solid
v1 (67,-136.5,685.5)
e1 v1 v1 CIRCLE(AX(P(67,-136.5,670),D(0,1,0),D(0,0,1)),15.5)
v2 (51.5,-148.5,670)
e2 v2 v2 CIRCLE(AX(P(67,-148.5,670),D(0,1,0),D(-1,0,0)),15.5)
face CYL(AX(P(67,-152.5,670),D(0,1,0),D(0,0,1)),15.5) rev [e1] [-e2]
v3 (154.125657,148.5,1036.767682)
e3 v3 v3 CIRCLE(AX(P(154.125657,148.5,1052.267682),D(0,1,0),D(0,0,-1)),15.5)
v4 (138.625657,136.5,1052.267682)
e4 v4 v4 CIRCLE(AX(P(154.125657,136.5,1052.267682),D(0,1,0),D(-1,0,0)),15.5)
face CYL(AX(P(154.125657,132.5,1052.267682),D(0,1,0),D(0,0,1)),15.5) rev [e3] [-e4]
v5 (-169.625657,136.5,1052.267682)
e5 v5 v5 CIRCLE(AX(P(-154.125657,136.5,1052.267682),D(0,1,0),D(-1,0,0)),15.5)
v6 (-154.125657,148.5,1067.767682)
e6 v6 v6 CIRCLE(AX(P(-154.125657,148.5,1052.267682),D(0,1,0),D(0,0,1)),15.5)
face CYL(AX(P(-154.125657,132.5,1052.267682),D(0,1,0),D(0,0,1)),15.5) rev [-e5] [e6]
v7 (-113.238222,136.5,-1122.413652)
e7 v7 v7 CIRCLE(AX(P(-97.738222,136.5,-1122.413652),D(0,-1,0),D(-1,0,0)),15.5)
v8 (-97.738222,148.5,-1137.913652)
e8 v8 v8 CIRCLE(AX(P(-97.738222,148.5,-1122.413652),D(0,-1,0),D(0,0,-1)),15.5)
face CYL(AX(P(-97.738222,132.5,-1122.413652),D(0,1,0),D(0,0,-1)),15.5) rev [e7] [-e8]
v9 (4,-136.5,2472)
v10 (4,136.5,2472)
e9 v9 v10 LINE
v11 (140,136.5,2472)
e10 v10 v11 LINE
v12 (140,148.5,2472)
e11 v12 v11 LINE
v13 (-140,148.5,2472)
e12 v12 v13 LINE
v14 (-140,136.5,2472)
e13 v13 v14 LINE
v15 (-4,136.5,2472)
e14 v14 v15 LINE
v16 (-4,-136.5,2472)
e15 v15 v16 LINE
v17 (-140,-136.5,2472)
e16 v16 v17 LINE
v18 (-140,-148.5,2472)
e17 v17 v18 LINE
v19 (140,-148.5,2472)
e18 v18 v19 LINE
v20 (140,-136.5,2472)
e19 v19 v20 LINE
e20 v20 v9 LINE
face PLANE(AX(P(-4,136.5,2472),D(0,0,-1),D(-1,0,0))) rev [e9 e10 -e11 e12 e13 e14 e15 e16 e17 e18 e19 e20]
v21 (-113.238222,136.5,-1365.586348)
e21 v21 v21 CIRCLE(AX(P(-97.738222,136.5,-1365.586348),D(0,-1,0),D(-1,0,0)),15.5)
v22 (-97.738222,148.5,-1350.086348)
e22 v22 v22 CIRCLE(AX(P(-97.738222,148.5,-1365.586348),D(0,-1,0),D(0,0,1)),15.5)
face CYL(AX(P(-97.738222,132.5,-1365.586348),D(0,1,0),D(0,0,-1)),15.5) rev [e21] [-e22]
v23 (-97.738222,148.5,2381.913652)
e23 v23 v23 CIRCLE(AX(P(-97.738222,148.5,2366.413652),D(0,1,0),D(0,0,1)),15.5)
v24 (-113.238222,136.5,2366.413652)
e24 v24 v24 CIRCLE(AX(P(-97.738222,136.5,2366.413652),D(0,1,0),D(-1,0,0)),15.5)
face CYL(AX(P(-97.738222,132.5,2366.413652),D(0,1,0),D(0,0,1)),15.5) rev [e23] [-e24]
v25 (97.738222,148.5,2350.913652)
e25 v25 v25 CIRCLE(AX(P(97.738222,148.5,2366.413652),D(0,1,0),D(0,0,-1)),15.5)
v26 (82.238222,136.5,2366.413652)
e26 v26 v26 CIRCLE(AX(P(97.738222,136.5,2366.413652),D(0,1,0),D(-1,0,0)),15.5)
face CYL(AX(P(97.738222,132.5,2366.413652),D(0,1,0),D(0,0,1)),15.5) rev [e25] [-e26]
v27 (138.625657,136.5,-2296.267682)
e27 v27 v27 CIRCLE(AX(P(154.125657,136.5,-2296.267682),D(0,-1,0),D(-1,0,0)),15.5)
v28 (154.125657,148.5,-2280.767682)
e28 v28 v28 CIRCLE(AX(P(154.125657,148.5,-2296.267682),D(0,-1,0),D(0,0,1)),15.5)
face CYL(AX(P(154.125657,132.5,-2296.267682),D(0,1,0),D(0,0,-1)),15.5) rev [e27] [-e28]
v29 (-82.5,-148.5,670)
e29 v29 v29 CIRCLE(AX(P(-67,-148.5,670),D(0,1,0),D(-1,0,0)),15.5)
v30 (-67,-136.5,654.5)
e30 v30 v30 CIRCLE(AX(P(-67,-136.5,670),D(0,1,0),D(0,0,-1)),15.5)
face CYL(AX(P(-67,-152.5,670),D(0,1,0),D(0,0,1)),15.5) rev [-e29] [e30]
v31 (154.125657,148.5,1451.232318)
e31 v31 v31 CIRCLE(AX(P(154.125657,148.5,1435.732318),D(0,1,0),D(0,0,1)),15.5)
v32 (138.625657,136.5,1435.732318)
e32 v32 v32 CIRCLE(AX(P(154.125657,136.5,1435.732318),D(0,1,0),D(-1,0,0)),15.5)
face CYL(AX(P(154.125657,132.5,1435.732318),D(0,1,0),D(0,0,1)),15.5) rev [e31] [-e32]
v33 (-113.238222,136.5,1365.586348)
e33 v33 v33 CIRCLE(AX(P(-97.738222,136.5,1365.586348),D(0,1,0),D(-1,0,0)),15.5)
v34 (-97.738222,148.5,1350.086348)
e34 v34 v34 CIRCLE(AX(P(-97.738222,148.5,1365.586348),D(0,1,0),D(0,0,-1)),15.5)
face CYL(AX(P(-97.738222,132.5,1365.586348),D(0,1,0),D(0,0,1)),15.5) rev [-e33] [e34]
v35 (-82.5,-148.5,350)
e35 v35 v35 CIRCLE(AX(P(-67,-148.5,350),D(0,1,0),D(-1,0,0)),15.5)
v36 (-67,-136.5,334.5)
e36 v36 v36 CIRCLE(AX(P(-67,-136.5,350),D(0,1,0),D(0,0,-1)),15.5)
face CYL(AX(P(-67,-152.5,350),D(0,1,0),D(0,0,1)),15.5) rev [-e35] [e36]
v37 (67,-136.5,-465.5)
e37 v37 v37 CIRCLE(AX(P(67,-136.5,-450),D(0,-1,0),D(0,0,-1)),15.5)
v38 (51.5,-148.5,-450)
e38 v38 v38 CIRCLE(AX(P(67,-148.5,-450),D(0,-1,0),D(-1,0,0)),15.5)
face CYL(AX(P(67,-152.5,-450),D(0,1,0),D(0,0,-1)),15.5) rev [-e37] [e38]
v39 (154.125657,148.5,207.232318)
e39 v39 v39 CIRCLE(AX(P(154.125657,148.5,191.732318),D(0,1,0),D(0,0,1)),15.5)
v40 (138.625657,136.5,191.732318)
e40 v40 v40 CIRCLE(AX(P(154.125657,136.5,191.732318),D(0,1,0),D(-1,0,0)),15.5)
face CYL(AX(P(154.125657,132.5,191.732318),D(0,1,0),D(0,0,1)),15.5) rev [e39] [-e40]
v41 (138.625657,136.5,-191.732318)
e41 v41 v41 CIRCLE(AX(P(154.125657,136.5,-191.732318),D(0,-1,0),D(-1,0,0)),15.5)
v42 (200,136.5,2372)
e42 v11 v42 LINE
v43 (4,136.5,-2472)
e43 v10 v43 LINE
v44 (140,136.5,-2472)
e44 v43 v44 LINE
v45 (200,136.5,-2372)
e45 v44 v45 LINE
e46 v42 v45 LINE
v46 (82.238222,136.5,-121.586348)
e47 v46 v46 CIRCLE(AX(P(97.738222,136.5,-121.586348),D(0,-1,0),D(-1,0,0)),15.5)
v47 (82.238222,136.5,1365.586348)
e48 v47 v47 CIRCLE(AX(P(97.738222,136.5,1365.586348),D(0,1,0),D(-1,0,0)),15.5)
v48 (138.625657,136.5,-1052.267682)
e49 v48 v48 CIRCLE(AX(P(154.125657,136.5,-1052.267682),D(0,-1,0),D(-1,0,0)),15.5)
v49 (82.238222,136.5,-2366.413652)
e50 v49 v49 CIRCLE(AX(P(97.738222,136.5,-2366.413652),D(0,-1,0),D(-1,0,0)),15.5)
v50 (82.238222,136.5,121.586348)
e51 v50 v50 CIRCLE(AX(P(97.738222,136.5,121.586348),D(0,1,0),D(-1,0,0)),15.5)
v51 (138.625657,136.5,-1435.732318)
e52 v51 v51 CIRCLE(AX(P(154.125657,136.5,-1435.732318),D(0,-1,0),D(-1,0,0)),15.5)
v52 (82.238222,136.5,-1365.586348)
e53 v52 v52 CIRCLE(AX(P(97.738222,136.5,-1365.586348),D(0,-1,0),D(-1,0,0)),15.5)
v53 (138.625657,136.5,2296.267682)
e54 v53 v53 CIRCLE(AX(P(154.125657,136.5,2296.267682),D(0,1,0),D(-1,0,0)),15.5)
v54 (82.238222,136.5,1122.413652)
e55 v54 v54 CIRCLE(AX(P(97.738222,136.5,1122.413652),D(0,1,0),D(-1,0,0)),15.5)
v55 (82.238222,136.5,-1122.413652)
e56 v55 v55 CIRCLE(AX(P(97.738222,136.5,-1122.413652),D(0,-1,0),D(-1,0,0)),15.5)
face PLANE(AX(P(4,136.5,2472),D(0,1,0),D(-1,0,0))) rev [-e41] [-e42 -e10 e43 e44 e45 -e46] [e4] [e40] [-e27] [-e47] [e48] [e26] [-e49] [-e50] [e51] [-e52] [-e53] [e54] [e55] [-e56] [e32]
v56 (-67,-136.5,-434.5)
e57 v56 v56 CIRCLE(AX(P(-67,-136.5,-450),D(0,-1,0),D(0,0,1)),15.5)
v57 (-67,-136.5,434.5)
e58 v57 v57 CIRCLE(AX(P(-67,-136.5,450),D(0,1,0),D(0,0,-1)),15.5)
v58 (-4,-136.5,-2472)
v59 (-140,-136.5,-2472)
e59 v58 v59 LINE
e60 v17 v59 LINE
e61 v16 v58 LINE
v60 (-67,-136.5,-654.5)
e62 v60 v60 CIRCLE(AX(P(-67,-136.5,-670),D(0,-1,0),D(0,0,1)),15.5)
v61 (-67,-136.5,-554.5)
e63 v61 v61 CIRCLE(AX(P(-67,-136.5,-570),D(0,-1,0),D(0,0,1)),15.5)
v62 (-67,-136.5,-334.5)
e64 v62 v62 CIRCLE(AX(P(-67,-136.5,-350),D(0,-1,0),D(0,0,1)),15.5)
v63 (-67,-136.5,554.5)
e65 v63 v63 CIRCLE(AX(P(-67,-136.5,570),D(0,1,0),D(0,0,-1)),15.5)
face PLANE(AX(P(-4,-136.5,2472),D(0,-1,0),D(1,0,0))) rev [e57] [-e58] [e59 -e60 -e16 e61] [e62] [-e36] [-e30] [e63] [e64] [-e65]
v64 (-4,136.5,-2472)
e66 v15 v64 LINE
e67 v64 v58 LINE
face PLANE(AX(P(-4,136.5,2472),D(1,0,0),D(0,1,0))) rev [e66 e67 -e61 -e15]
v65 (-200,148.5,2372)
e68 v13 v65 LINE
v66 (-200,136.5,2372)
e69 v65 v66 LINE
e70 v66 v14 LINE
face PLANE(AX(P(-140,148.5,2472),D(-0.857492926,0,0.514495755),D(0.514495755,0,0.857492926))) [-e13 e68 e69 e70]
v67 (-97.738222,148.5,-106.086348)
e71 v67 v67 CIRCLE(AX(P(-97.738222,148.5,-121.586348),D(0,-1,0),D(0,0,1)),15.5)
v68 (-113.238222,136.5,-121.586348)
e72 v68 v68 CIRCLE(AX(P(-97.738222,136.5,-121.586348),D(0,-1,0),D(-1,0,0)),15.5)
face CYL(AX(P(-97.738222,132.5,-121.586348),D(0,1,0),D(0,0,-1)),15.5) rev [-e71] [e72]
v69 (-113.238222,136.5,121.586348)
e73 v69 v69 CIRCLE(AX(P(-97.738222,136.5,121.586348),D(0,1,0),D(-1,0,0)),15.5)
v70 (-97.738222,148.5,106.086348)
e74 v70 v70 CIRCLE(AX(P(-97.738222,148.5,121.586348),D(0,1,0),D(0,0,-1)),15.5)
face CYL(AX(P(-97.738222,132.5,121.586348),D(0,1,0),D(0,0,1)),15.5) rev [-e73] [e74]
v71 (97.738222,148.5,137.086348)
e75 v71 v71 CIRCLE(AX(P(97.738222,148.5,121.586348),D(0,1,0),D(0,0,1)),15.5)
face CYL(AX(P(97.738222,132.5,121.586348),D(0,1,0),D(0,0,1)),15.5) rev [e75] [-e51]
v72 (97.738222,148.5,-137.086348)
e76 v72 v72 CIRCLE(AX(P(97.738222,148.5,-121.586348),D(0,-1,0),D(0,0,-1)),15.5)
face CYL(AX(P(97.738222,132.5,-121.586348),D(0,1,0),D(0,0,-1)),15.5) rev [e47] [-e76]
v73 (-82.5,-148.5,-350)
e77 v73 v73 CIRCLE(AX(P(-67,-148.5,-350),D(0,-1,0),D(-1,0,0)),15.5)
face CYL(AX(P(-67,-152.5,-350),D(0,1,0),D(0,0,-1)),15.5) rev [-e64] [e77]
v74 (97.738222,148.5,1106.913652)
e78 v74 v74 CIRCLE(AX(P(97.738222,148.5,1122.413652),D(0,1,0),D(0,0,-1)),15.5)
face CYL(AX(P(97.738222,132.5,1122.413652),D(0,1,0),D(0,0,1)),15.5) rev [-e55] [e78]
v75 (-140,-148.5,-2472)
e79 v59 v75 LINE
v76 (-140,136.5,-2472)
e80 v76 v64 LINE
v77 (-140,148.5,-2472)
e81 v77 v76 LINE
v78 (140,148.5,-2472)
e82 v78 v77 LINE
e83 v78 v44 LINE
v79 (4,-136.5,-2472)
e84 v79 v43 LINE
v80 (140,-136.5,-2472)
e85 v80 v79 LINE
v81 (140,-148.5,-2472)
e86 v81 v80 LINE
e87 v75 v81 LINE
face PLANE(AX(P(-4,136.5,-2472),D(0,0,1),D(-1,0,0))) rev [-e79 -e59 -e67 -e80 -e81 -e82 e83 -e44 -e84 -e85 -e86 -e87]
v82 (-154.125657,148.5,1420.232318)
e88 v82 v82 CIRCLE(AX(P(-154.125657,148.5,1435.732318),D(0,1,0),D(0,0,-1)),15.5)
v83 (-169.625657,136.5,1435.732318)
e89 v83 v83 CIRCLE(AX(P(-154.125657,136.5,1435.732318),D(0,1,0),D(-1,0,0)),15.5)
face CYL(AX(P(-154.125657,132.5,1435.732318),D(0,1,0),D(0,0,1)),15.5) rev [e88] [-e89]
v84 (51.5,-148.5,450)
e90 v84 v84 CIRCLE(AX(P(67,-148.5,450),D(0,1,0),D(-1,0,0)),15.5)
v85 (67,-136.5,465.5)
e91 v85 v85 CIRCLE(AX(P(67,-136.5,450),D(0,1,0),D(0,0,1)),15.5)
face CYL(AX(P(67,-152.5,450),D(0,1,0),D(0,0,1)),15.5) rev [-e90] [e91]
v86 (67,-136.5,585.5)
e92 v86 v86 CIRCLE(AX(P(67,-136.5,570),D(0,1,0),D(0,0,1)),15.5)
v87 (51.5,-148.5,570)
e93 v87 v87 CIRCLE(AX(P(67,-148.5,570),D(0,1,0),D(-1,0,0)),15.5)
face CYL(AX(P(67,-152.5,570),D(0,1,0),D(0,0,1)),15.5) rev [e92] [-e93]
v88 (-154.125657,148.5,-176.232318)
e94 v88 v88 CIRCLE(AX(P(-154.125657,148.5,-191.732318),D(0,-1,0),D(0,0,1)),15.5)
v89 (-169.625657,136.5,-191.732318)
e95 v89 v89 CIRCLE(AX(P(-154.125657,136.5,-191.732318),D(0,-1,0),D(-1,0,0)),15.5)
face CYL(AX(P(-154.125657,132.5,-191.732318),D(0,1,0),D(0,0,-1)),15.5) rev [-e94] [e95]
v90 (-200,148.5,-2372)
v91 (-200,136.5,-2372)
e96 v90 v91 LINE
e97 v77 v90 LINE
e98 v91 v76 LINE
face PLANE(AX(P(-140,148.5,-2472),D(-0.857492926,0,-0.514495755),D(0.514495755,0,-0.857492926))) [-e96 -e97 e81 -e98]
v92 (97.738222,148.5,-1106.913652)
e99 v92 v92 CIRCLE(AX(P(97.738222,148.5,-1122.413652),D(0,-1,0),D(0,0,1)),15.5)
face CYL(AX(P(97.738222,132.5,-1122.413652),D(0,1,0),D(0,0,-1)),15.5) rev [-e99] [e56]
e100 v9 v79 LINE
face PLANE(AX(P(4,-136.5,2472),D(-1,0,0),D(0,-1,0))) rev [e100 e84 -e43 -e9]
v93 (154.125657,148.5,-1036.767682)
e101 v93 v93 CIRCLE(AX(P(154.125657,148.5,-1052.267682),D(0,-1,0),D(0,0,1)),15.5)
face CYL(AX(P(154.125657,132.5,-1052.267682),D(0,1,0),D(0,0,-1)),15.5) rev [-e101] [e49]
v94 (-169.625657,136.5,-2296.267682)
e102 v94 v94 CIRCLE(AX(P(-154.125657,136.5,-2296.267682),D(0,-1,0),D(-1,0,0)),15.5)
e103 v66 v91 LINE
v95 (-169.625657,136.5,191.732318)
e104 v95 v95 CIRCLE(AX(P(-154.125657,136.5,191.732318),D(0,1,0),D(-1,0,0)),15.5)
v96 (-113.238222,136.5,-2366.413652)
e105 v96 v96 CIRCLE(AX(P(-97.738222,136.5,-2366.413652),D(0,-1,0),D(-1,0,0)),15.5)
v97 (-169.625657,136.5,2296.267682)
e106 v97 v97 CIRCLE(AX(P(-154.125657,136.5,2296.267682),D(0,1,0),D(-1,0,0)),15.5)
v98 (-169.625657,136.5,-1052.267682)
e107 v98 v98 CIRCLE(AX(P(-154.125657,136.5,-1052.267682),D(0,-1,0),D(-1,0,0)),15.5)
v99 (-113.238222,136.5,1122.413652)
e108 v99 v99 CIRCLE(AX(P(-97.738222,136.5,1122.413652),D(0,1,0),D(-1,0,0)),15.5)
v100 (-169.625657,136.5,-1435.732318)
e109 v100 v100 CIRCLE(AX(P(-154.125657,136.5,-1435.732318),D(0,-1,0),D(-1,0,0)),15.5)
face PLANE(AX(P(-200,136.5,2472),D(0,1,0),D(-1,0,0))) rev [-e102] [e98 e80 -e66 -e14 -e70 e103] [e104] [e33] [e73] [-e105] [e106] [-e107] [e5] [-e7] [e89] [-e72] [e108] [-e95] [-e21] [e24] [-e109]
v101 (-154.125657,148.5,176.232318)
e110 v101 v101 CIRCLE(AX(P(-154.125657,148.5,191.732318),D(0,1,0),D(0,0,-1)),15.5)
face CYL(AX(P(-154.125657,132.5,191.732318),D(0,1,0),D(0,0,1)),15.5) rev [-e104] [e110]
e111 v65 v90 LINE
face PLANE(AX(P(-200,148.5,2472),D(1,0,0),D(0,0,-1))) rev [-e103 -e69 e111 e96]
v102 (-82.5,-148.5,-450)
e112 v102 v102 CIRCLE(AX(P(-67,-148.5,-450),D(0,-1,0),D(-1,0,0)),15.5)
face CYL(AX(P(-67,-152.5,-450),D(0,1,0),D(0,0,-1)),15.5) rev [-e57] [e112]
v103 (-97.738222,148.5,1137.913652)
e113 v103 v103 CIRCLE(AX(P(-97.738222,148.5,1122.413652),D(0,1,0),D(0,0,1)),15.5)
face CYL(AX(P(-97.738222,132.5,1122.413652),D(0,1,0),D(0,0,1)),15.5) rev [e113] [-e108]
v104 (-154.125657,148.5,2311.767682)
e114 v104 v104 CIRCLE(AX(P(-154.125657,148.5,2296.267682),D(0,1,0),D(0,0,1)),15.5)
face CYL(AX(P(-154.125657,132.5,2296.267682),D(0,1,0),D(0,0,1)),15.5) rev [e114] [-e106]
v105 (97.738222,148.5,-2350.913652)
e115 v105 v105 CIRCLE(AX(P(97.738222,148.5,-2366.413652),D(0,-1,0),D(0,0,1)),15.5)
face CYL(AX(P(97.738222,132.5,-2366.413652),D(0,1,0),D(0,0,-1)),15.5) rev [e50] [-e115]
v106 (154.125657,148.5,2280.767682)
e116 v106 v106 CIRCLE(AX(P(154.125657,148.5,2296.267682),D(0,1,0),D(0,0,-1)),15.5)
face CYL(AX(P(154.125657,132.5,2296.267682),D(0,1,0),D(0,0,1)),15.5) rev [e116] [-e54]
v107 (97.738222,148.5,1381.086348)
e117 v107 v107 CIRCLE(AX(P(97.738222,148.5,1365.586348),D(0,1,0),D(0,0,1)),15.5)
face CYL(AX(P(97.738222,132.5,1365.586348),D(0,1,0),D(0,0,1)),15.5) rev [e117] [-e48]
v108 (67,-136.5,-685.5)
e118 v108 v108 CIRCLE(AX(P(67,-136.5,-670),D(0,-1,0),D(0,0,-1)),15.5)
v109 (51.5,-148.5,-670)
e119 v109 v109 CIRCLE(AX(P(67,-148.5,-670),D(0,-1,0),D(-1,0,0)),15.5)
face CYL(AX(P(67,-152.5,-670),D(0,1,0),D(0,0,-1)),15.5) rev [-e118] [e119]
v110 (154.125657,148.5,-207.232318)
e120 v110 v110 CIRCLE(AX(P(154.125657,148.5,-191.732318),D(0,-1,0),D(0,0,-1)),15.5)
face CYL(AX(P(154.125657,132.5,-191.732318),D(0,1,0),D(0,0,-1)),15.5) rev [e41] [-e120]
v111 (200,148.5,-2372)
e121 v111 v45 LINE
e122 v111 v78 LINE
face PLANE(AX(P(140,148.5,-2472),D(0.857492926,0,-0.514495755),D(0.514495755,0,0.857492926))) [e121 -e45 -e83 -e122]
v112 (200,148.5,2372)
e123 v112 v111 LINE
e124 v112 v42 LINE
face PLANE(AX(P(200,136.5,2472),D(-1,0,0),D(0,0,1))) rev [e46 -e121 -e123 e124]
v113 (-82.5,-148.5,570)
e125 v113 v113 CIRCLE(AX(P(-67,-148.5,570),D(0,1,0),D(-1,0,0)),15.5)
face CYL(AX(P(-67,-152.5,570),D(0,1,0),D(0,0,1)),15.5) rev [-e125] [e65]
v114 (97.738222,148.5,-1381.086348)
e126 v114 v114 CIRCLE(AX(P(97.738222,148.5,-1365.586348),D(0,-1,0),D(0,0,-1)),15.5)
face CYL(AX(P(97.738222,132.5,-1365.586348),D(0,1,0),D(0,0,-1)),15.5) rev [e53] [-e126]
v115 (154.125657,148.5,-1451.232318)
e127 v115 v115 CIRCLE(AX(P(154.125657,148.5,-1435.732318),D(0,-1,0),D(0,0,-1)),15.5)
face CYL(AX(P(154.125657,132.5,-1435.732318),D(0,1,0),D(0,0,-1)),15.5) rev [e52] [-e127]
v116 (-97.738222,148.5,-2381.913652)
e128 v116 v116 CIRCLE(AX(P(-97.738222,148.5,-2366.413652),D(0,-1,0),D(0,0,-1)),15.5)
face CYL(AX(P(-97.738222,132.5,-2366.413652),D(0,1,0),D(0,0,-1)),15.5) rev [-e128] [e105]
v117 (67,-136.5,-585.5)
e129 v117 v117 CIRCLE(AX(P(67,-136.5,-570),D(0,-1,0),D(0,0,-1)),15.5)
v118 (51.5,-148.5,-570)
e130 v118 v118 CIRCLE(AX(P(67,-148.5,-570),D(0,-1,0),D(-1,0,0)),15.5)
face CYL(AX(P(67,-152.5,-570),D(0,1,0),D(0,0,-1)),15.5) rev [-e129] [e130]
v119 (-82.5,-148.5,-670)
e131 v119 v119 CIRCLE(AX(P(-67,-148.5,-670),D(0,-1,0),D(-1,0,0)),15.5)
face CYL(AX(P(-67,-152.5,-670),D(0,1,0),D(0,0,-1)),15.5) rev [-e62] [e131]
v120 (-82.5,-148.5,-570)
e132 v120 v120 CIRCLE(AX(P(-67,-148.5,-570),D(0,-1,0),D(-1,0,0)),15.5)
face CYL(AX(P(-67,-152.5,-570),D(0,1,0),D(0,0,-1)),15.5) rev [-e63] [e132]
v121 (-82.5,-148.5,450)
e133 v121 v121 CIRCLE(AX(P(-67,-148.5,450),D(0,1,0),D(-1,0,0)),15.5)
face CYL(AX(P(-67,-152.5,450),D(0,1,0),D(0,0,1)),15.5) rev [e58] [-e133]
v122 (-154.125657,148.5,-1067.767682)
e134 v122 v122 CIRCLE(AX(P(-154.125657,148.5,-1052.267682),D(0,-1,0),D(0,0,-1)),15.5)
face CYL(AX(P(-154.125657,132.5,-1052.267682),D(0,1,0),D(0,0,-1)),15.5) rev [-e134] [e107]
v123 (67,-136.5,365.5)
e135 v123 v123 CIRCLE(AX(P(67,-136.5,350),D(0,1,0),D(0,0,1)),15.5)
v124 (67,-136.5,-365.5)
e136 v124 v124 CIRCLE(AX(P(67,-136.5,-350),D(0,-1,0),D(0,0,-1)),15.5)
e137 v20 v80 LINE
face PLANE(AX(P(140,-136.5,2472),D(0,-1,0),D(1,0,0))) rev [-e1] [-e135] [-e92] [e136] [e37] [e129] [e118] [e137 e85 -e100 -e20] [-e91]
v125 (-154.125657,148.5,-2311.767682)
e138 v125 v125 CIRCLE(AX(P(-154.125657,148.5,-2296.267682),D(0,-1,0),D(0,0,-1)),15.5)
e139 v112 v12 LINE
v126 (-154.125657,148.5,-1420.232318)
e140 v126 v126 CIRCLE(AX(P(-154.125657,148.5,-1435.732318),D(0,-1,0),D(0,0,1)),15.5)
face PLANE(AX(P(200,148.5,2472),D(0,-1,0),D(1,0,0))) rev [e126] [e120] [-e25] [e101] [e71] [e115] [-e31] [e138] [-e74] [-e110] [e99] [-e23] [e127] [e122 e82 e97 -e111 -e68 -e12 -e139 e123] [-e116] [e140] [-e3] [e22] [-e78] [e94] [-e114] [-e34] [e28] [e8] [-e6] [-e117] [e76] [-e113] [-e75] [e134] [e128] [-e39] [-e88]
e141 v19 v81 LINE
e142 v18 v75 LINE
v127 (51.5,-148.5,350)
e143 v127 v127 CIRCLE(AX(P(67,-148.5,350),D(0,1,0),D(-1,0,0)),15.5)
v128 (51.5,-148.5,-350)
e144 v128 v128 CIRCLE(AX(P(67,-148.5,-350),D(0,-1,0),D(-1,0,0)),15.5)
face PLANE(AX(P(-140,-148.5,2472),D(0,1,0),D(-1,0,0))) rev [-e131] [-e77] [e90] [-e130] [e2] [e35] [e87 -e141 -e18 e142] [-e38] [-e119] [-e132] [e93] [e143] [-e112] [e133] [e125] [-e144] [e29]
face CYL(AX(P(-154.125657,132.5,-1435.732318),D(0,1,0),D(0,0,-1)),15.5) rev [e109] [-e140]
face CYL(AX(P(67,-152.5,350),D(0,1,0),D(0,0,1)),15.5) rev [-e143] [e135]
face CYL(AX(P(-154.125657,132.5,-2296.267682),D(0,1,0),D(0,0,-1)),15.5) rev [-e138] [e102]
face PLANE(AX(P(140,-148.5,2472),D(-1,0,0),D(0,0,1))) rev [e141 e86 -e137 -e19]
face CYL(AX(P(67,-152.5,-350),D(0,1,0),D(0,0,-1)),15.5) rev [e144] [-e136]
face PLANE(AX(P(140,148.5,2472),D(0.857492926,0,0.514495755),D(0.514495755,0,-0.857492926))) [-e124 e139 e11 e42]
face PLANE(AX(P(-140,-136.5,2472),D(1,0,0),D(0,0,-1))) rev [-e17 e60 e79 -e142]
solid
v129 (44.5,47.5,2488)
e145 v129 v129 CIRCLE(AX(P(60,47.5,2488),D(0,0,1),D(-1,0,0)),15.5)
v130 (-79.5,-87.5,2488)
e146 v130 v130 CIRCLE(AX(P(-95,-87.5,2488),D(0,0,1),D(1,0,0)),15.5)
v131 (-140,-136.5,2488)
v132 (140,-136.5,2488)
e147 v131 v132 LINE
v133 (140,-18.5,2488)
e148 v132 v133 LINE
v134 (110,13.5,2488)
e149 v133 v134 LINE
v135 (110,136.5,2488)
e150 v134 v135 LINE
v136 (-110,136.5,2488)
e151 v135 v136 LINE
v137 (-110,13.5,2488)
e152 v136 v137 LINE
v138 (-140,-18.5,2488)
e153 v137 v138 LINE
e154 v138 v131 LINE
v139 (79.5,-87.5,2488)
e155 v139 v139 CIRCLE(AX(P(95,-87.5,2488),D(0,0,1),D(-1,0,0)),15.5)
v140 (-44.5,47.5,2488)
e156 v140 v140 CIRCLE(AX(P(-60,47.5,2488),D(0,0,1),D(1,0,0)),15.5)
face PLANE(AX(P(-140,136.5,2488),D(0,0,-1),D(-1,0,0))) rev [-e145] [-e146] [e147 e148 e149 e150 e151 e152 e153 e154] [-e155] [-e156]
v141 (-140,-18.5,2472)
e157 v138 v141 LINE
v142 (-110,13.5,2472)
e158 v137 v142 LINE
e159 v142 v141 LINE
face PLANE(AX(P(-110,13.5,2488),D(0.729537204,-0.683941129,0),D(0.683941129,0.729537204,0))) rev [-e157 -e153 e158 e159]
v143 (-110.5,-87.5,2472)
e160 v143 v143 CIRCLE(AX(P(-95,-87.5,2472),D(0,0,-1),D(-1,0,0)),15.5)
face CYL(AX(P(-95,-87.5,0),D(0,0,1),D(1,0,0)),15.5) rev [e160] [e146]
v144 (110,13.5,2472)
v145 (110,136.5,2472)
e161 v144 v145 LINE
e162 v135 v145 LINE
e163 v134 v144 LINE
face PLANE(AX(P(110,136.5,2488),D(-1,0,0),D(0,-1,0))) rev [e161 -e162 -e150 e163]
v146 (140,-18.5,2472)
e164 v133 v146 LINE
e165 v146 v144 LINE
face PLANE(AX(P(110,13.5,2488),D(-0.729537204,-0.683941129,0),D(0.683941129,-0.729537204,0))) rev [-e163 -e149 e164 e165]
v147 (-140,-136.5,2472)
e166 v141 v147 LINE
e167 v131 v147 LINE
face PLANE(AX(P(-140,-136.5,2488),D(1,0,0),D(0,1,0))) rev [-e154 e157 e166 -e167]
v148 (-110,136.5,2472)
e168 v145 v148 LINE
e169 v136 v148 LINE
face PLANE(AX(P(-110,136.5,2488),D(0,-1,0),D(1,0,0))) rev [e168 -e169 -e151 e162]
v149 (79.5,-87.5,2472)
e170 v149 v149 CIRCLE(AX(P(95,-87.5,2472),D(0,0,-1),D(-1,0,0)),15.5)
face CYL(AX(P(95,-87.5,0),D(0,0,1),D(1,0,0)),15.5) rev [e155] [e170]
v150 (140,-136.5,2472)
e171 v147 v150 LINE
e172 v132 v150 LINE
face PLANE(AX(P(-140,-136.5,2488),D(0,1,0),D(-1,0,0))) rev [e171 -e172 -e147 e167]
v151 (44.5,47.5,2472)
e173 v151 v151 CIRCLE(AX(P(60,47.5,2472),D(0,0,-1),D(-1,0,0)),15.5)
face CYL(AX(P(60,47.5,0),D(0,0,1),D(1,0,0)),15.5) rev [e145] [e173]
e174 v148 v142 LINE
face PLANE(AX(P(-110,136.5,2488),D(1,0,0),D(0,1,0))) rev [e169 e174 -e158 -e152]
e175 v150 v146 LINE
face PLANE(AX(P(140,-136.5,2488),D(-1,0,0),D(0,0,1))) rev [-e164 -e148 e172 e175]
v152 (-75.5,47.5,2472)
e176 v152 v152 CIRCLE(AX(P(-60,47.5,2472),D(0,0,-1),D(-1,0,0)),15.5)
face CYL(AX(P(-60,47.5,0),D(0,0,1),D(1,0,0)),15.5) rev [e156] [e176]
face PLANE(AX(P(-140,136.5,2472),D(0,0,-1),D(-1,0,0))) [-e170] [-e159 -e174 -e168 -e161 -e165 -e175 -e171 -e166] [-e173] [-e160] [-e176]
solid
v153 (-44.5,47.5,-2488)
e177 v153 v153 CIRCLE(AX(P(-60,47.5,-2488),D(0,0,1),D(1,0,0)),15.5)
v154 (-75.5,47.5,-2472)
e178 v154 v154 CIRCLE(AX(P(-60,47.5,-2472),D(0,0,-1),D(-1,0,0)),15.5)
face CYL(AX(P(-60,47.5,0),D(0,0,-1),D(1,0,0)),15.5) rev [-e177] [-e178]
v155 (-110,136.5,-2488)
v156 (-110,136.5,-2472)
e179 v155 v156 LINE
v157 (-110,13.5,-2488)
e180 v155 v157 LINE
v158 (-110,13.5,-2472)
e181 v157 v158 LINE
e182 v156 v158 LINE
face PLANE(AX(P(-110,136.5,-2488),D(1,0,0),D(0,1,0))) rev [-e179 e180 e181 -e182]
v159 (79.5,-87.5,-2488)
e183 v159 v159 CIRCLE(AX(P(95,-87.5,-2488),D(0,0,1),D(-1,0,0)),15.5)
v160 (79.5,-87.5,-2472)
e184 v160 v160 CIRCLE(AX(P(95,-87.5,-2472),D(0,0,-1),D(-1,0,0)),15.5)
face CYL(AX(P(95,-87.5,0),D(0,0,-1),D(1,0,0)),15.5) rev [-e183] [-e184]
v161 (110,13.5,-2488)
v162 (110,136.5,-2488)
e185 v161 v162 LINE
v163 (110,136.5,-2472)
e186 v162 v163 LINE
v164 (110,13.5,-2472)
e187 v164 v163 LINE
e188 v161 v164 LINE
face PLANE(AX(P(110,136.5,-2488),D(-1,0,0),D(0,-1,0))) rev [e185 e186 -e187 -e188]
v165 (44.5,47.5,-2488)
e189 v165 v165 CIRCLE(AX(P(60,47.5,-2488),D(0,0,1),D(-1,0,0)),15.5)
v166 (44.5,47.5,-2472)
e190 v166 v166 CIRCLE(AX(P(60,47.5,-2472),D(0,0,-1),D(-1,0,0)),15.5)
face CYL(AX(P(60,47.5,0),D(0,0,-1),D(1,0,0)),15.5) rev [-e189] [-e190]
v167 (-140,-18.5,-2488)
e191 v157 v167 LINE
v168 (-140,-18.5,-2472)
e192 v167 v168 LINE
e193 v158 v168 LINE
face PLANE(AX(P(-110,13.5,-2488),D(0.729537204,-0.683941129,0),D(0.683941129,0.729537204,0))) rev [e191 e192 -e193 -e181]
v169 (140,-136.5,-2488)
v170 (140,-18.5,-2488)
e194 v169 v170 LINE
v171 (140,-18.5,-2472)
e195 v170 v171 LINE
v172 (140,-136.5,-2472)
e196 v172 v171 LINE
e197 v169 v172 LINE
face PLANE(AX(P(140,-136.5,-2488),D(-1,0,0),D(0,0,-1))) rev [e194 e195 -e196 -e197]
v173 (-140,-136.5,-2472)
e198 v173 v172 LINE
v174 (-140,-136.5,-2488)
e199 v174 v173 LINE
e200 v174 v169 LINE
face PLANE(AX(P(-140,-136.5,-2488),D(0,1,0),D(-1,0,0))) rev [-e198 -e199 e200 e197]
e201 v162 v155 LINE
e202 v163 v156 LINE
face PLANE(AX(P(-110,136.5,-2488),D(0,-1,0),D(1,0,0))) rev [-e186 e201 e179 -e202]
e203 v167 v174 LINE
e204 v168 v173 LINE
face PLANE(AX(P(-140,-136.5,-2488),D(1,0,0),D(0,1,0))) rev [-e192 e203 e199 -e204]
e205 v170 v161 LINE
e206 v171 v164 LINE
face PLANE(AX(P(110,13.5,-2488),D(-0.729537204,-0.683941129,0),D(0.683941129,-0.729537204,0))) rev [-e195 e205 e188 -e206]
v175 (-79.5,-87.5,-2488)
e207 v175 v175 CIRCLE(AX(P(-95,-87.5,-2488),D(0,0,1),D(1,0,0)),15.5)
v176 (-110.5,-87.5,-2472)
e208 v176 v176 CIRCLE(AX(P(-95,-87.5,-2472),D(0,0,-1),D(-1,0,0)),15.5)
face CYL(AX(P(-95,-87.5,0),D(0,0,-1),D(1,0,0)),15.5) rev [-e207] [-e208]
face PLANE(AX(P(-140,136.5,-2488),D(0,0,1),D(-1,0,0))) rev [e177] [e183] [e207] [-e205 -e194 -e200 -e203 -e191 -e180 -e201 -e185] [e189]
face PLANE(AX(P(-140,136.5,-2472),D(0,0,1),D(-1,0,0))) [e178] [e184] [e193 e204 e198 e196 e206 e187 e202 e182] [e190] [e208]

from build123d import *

# Parameters (mm, degrees)
EXTRUDE_1_DEPTH      = 2472
EXTRUDE_2_DEPTH      = 16
SKETCH_5_R           = 15.5
CUT_EXTRUDE_5_DEPTH  = 16
SKETCH_4_R           = 15.5
CUT_EXTRUDE_3_DEPTH  = 2501.439211419
CUT_EXTRUDE_6_DEPTH  = 2501.439211419
SKETCH_7_R           = 15.5
CUT_EXTRUDE_7_DEPTH  = 16
MIRROR_START         = 136.5
MIRROR_1_OUTLINE_R   = 15.5
MIRROR_1_DEPTH       = 12
MIRROR_START_2       = -148.5
MIRROR_1_2_OUTLINE_W = 280
MIRROR_1_2_OUTLINE_H = 2472
MIRROR_1_2_OUTLINE_R = 15.5
MIRROR_1_2_DEPTH     = 12
MIRROR_START_3       = -136.5
MIRROR_1_3_OUTLINE_W = 8
MIRROR_1_3_OUTLINE_H = 2472
MIRROR_1_3_DEPTH     = 273


# Read off the part's stored shape, not the designer's step: 镜向1
with BuildPart() as part:
    # 草图2 → 拉伸1 (new body)
    with BuildSketch(Plane.XY):
        Polygon((-4, 136.5), (-4, -136.5), (-140, -136.5), (-140, -148.5), (140, -148.5), (140, -136.5), (4, -136.5), (4, 136.5), (200, 136.5), (200, 148.5), (-200, 148.5), (-200, 136.5), align=None)
    extrude(amount=EXTRUDE_1_DEPTH)

    # 草图5 → 拉伸5 (cut)
    with BuildSketch(Plane(origin=(0, 148.5, 0), x_dir=(-1, 0, 0), z_dir=(0, 1, 0))):
        with Locations(Location((97.738221798, 2366.413652083, 0), (0, 0, 90))):
            Circle(SKETCH_5_R)
        with Locations(Location((154.125657451, 2296.267682131, 0), (0, 0, 90))):
            Circle(SKETCH_5_R)
        with Locations(Location((97.738221798, 1122.413652083, 0), (0, 0, 90))):
            Circle(SKETCH_5_R)
        with Locations(Location((154.125657451, 1052.267682131, 0), (0, 0, 90))):
            Circle(SKETCH_5_R)
        with Locations(Location((-97.738221798, 1365.586347917, 0), (0, 0, 90))):
            Circle(SKETCH_5_R)
        with Locations(Location((-154.125657451, 1435.732317869, 0), (0, 0, 90))):
            Circle(SKETCH_5_R)
        with Locations((154.125657451, 1435.732317869)):
            Circle(SKETCH_5_R)
        with Locations((97.738221798, 1365.586347917)):
            Circle(SKETCH_5_R)
        with Locations((-154.125657451, 1052.267682131)):
            Circle(SKETCH_5_R)
        with Locations((-97.738221798, 1122.413652083)):
            Circle(SKETCH_5_R)
        with Locations((-154.125657451, 2296.267682131)):
            Circle(SKETCH_5_R)
        with Locations((-97.738221798, 2366.413652083)):
            Circle(SKETCH_5_R)
        with Locations(Location((-97.738221798, 121.586347917, 0), (0, 0, 90))):
            Circle(SKETCH_5_R)
        with Locations(Location((-154.125657451, 191.732317869, 0), (0, 0, 90))):
            Circle(SKETCH_5_R)
        with Locations((154.125657451, 191.732317869)):
            Circle(SKETCH_5_R)
        with Locations((97.738221798, 121.586347917)):
            Circle(SKETCH_5_R)
    extrude(amount=-CUT_EXTRUDE_5_DEPTH, mode=Mode.SUBTRACT)

    # 草图6 → 拉伸6 (cut, through all)
    with BuildSketch(Plane(origin=(0, 0, 0), x_dir=(1, 0, 0), z_dir=(0, 1, 0))):
        Polygon((200, -2472), (140, -2472), (200, -2372), align=None)
        Polygon((-200, -2472), (-200, -2372), (-140, -2472), align=None)
    extrude(amount=CUT_EXTRUDE_6_DEPTH, mode=Mode.SUBTRACT)

    # 草图7 → 拉伸7 (cut)
    with BuildSketch(Plane(origin=(0, -136.5, 0), x_dir=(1, 0, 0), z_dir=(0, 1, 0))):
        with Locations(Location((67, -670, 0), (0, 0, 270))):
            Circle(SKETCH_7_R)
        with Locations(Location((67, -570, 0), (0, 0, 270))):
            Circle(SKETCH_7_R)
        with Locations(Location((67, -450, 0), (0, 0, 270))):
            Circle(SKETCH_7_R)
        with Locations(Location((67, -350, 0), (0, 0, 270))):
            Circle(SKETCH_7_R)
        with Locations(Location((-67, -350, 0), (0, 0, 180))):
            Circle(SKETCH_7_R)
        with Locations(Location((-67, -450, 0), (0, 0, 180))):
            Circle(SKETCH_7_R)
        with Locations(Location((-67, -570, 0), (0, 0, 180))):
            Circle(SKETCH_7_R)
        with Locations(Location((-67, -670, 0), (0, 0, 180))):
            Circle(SKETCH_7_R)
    extrude(amount=-CUT_EXTRUDE_7_DEPTH, mode=Mode.SUBTRACT)

    # 镜向1 outline → 镜向1 (add)
    with BuildSketch(Plane(origin=(0, 0, 0), x_dir=(1, 0, 0), z_dir=(0, 1, 0)).offset(MIRROR_START)):
        Polygon((-200, 2372), (-200, 0), (200, 0), (200, 2372), (140, 2472), (-140, 2472), align=None)
        with Locations((-154.125657451, 2296.267682131)):
            Circle(MIRROR_1_OUTLINE_R, mode=Mode.SUBTRACT)
        with Locations((-154.125657451, 1435.732317869)):
            Circle(MIRROR_1_OUTLINE_R, mode=Mode.SUBTRACT)
        with Locations((-154.125657451, 1052.267682131)):
            Circle(MIRROR_1_OUTLINE_R, mode=Mode.SUBTRACT)
        with Locations((-154.125657451, 191.732317869)):
            Circle(MIRROR_1_OUTLINE_R, mode=Mode.SUBTRACT)
        with Locations((-97.738221798, 1122.413652083)):
            Circle(MIRROR_1_OUTLINE_R, mode=Mode.SUBTRACT)
        with Locations((-97.738221798, 1365.586347917)):
            Circle(MIRROR_1_OUTLINE_R, mode=Mode.SUBTRACT)
        with Locations((-97.738221798, 2366.413652083)):
            Circle(MIRROR_1_OUTLINE_R, mode=Mode.SUBTRACT)
        with Locations((-97.738221798, 121.586347917)):
            Circle(MIRROR_1_OUTLINE_R, mode=Mode.SUBTRACT)
        with Locations((97.738221798, 2366.413652083)):
            Circle(MIRROR_1_OUTLINE_R, mode=Mode.SUBTRACT)
        with Locations((154.125657451, 2296.267682131)):
            Circle(MIRROR_1_OUTLINE_R, mode=Mode.SUBTRACT)
        with Locations((154.125657451, 1435.732317869)):
            Circle(MIRROR_1_OUTLINE_R, mode=Mode.SUBTRACT)
        with Locations((154.125657451, 1052.267682131)):
            Circle(MIRROR_1_OUTLINE_R, mode=Mode.SUBTRACT)
        with Locations((154.125657451, 191.732317869)):
            Circle(MIRROR_1_OUTLINE_R, mode=Mode.SUBTRACT)
        with Locations((97.738221798, 121.586347917)):
            Circle(MIRROR_1_OUTLINE_R, mode=Mode.SUBTRACT)
        with Locations((97.738221798, 1122.413652083)):
            Circle(MIRROR_1_OUTLINE_R, mode=Mode.SUBTRACT)
        with Locations((97.738221798, 1365.586347917)):
            Circle(MIRROR_1_OUTLINE_R, mode=Mode.SUBTRACT)
    extrude(amount=MIRROR_1_DEPTH)

    # Mirror 1 2 outline → Mirror 1 2 (add)
    with BuildSketch(Plane(origin=(0, 0, 0), x_dir=(1, 0, 0), z_dir=(0, 1, 0)).offset(MIRROR_START_2)):
        with Locations((0, 1236)):
            Rectangle(MIRROR_1_2_OUTLINE_W, MIRROR_1_2_OUTLINE_H)
        with Locations((-67, 350)):
            Circle(MIRROR_1_2_OUTLINE_R, mode=Mode.SUBTRACT)
        with Locations((-67, 450)):
            Circle(MIRROR_1_2_OUTLINE_R, mode=Mode.SUBTRACT)
        with Locations((-67, 570)):
            Circle(MIRROR_1_2_OUTLINE_R, mode=Mode.SUBTRACT)
        with Locations((-67, 670)):
            Circle(MIRROR_1_2_OUTLINE_R, mode=Mode.SUBTRACT)
        with Locations((67, 350)):
            Circle(MIRROR_1_2_OUTLINE_R, mode=Mode.SUBTRACT)
        with Locations((67, 450)):
            Circle(MIRROR_1_2_OUTLINE_R, mode=Mode.SUBTRACT)
        with Locations((67, 570)):
            Circle(MIRROR_1_2_OUTLINE_R, mode=Mode.SUBTRACT)
        with Locations((67, 670)):
            Circle(MIRROR_1_2_OUTLINE_R, mode=Mode.SUBTRACT)
    extrude(amount=MIRROR_1_2_DEPTH)

    # Mirror 1 3 outline → Mirror 1 3 (add)
    with BuildSketch(Plane(origin=(0, 0, 0), x_dir=(1, 0, 0), z_dir=(0, 1, 0)).offset(MIRROR_START_3)):
        with Locations((0, 1236)):
            Rectangle(MIRROR_1_3_OUTLINE_W, MIRROR_1_3_OUTLINE_H)
    extrude(amount=MIRROR_1_3_DEPTH)


with BuildPart() as body_2:
    # 草图3 → 拉伸2 (new body)
    with BuildSketch(Plane.XY.offset(2472)):
        Polygon((-110, 136.5), (110, 136.5), (110, 13.5), (140, -18.5), (140, -136.5), (-140, -136.5), (-140, -18.5), (-110, 13.5), align=None)
    extrude(amount=EXTRUDE_2_DEPTH)

    # 草图4 → 拉伸3 (cut, through all)
    with BuildSketch(Plane.XY.offset(2488)):
        with Locations((-60, 47.5)):
            Circle(SKETCH_4_R)
        with Locations((-95, -87.5)):
            Circle(SKETCH_4_R)
        with Locations(Location((95, -87.5, 0), (0, 0, 180))):
            Circle(SKETCH_4_R)
        with Locations(Location((60, 47.5, 0), (0, 0, 180))):
            Circle(SKETCH_4_R)
    extrude(amount=-CUT_EXTRUDE_3_DEPTH, mode=Mode.SUBTRACT)


with BuildPart() as body_3:
    # 镜向2: mirrored copy
    add(body_2.part.mirror(Plane.XY))


solid = Compound([part.part, body_2.part, body_3.part])
